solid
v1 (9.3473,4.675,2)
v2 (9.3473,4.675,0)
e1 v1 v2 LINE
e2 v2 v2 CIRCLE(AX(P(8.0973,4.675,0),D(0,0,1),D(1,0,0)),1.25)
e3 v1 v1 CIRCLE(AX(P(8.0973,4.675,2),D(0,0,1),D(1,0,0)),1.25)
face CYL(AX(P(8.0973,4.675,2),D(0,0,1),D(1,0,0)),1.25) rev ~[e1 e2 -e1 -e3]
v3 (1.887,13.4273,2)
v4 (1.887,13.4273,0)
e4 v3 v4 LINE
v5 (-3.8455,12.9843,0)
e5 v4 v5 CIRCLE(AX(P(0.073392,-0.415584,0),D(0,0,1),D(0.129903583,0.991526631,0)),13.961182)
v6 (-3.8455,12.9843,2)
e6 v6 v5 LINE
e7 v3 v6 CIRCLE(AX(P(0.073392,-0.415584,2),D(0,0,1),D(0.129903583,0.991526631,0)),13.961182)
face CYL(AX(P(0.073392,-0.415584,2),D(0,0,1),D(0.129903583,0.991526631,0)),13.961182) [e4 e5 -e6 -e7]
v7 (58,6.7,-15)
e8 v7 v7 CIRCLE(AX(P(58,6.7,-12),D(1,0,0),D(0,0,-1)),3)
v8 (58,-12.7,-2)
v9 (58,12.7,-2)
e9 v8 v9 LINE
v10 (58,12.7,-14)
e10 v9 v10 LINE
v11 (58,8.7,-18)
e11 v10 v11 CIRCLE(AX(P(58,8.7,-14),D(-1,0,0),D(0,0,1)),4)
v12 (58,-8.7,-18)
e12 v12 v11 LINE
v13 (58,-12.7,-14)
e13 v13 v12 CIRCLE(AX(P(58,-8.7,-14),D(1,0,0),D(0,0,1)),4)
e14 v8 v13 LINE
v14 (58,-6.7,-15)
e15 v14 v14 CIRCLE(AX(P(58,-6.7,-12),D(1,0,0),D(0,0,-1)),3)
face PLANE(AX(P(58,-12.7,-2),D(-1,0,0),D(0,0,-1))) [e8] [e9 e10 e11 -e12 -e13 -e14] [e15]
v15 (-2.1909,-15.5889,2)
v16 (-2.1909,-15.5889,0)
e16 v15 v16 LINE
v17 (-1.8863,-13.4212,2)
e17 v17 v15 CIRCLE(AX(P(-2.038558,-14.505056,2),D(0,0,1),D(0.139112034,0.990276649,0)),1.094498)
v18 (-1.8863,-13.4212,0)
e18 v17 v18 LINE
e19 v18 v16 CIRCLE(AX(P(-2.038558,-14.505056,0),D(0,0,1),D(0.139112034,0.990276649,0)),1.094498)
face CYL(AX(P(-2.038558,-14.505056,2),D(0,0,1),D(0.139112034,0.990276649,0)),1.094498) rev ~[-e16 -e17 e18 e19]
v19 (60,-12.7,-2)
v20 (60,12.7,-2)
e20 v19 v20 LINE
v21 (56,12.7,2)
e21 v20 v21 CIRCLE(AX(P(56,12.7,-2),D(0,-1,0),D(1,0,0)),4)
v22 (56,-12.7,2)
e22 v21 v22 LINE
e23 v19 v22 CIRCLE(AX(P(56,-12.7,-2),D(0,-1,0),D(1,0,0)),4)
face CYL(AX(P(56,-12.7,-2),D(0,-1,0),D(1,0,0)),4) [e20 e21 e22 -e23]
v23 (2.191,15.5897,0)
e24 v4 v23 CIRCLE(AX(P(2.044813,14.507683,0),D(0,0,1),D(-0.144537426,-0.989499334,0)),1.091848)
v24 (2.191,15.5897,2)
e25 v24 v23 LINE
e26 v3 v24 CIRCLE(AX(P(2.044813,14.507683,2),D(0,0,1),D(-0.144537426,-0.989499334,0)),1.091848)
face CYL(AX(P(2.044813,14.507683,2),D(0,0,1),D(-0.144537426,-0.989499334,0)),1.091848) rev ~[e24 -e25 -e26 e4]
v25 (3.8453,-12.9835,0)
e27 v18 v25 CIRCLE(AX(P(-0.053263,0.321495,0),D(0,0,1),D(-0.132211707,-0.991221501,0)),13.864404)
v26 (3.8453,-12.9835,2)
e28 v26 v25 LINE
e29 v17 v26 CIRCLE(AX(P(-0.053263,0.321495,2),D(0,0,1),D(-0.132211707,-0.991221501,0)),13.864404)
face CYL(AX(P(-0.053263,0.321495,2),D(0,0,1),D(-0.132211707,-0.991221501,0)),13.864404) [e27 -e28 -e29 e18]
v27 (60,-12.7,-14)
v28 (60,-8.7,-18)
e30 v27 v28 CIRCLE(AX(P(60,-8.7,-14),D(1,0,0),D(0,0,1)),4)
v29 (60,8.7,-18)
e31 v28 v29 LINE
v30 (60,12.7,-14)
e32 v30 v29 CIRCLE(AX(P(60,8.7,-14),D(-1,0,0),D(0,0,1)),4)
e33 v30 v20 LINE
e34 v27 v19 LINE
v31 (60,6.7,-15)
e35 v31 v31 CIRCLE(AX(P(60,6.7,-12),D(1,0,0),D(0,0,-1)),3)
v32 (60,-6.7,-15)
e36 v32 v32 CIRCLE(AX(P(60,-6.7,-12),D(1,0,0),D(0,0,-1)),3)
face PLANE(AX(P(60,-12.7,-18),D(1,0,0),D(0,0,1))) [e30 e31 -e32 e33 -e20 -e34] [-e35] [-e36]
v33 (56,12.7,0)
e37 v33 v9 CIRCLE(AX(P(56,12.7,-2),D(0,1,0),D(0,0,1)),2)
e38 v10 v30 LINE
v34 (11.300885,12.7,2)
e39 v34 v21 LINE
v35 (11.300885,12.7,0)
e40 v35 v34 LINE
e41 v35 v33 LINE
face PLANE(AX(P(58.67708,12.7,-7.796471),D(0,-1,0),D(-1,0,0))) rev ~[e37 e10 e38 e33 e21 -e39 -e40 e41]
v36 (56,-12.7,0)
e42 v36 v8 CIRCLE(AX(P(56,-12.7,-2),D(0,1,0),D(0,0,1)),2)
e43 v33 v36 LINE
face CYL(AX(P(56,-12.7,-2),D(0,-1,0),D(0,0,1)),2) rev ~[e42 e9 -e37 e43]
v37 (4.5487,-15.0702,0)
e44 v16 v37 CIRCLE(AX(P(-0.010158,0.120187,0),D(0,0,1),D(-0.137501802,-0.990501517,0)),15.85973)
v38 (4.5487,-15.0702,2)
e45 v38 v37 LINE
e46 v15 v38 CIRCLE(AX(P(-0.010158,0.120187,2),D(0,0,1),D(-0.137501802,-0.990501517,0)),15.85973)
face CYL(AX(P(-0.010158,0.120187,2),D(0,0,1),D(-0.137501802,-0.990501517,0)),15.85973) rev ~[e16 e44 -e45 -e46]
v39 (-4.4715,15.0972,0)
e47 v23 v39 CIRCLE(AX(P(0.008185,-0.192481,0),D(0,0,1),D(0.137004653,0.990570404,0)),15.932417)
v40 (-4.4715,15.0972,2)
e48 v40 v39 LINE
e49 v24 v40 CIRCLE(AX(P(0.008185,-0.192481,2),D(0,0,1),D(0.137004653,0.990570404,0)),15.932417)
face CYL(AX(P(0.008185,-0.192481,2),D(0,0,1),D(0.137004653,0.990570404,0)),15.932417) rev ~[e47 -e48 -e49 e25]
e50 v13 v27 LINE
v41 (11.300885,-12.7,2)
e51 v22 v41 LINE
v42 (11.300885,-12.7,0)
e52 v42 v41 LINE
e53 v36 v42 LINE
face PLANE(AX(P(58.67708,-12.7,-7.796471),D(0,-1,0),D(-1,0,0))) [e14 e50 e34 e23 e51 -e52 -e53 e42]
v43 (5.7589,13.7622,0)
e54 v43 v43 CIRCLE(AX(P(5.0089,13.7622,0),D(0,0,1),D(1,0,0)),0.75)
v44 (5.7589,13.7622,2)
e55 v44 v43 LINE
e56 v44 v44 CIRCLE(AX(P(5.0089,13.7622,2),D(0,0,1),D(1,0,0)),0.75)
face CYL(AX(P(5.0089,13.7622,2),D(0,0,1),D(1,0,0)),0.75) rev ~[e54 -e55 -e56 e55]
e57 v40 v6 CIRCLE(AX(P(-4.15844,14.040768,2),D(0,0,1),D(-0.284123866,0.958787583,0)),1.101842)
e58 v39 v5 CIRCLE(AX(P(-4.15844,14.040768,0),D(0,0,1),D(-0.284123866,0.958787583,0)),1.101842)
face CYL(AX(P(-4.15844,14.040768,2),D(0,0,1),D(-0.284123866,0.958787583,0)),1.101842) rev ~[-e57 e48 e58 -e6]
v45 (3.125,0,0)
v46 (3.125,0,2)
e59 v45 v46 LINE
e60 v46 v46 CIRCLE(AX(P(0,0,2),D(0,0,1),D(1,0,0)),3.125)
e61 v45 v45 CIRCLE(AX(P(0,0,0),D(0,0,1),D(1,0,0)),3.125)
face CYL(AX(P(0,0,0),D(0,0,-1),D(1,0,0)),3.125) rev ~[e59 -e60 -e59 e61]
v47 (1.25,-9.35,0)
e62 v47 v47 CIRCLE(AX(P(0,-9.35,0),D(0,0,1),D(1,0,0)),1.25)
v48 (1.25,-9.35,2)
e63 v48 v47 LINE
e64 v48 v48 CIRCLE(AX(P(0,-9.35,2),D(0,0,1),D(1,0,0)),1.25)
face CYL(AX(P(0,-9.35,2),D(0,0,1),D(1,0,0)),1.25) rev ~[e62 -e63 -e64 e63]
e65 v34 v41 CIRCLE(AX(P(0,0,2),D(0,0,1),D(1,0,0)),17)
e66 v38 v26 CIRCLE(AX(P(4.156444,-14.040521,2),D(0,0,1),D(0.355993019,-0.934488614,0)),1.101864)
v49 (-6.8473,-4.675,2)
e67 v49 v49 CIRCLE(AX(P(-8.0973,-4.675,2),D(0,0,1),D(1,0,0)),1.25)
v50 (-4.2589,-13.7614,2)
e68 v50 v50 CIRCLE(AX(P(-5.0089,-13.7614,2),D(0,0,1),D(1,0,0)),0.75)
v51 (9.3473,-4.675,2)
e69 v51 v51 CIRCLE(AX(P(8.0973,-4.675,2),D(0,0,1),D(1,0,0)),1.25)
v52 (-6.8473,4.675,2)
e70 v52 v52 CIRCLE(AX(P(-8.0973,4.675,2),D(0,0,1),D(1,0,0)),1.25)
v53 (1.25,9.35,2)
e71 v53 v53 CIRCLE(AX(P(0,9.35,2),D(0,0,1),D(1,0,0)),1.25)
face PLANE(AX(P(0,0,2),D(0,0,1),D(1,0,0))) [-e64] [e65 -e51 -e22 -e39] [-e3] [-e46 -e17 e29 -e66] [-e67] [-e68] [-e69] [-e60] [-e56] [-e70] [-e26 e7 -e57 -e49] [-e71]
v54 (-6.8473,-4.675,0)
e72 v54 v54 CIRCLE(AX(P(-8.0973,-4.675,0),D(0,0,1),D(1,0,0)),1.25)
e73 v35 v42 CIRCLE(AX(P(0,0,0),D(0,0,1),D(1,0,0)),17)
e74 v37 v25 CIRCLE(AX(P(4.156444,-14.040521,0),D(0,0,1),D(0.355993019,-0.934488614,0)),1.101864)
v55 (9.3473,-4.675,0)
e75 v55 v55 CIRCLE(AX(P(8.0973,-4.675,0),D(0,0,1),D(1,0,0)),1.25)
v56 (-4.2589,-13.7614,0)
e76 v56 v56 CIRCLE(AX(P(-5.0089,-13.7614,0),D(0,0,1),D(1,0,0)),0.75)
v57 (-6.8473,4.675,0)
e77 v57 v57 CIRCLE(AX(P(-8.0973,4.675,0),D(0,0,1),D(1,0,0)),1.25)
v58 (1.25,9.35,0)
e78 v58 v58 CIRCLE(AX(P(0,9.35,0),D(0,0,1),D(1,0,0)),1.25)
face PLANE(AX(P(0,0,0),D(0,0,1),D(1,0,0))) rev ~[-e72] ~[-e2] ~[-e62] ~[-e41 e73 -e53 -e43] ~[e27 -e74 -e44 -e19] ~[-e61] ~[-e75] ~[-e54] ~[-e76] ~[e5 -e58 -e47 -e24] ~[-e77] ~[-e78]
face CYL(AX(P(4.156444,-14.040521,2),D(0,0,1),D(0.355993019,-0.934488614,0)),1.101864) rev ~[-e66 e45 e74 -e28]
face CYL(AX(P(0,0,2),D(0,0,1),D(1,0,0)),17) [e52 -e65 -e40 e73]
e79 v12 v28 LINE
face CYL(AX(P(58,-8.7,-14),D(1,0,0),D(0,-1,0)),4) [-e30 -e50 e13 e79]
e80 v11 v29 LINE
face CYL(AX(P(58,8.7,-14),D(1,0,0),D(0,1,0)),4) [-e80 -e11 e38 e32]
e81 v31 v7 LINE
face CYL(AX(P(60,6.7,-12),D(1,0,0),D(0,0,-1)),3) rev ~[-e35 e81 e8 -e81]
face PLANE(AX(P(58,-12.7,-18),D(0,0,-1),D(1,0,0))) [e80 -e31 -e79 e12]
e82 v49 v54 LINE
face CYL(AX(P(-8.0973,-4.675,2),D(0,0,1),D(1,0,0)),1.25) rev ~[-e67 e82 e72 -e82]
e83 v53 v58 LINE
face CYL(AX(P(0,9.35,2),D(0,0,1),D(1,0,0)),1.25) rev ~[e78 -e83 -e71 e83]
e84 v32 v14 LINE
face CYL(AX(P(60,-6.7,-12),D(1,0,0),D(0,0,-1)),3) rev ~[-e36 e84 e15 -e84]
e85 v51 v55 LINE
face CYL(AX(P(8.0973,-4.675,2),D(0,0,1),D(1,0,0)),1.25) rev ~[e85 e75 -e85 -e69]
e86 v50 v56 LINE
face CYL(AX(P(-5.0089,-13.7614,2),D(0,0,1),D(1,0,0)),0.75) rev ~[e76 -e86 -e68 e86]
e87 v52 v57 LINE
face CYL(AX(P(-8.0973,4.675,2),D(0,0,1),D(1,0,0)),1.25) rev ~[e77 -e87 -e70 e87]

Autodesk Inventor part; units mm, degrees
ref_plane "YZ Plane" through (0, 0, 0) normal (1, 0, 0) x (0, 1, 0)
ref_plane "XZ Plane" through (0, 0, 0) normal (0, 1, 0) x (-1, 0, 0)
ref_plane "XY Plane" through (0, 0, 0) normal (0, 0, 1) x (1, 0, 0)
sketch "Base" plane through (0, 0, 0) normal (0, 0, 1) x (1, 0, 0)
  circle A0 centre (0, 0) radius 3.125
  circle A1 centre (0, 0) radius 12.7
  line L0 (0, 12.7) -> (60, 12.7)
  line L1 (60, 12.7) -> (60, -12.7)
  line L2 (60, -12.7) -> (0, -12.7)
  dimension "d0" = 6.25
  dimension "d1" = 25.4
  dimension "d2" = 60
extrude "Plate1" add sketch "Base" along normal blind 2
sketch "Sketch2" plane through (58, -12.7, 2) normal (1, 0, 0) x (0, 1, 0)
  line L0 (25.4, 0) -> (0, 0)
  line L1 (0, 0) -> (0, -20)
  line L2 (0, -20) -> (25.4, -20)
  line L3 (25.4, -20) -> (25.4, 0)
edge flange "MountFeature" height 20 angle 90 thickness 2 bend radius 2 thickness toward (1, 0, 0) relief tear relief width 2 relief depth 1 edges at (60, 0, 0) wall of the first edge with corners at (58, 12.7, 2) (58, -12.7, 2) (58, -12.7, -18) (58, 12.7, -18)
bend "Bend1"
corner "Corner1"
fillet "MountFilletsFeature" radius 4 2 edges at (59, -12.7, -18) (59, 12.7, -18)
sketch "HubMountHoles" plane through (0, 0, 2) normal (0, 0, 1) x (1, 0, 0)
  circle A0 centre (0, 9.35) radius 1.25 projected
  circle A1 centre (8.0973, 4.675) radius 1.25 projected
  circle A2 centre (8.0973, -4.675) radius 1.25 projected
  circle A3 centre (0, -9.35) radius 1.25 projected
  circle A4 centre (-8.0973, -4.675) radius 1.25 projected
  circle A5 centre (-8.0973, 4.675) radius 1.25 projected
  point P0 (0, 0)
extrude "HubMountHolesFeature" cut sketch "HubMountHoles" against normal blind 2
sketch "PotMountHoles" plane through (0, 0, 2) normal (0, 0, 1) x (1, 0, 0)
  arc A0 (2.191, 15.5897) -> (-4.4715, 15.0972) centre (0.0082, -0.192) ccw
  arc A1 (-4.4715, 15.0972) -> (-3.8455, 12.9843) centre (-4.1585, 14.0408) ccw
  arc A2 (1.887, 13.4273) -> (-3.8455, 12.9843) centre (0.0734, -0.4153) ccw
  arc A3 (1.887, 13.4273) -> (2.191, 15.5897) centre (2.0448, 14.5077) ccw
  circle A4 centre (5.0089, 13.7622) radius 0.75
  circle A5 centre (-5.0089, -13.7614) radius 0.75
  arc A6 (-1.8863, -13.4212) -> (-2.1909, -15.5889) centre (-2.0386, -14.505) ccw
  arc A7 (-1.8863, -13.4212) -> (3.8453, -12.9835) centre (-0.0533, 0.3202) ccw
  arc A8 (-2.1909, -15.5889) -> (4.5487, -15.0702) centre (-0.0101, 0.1221) ccw
  arc A9 (4.5487, -15.0702) -> (3.8453, -12.9835) centre (4.1564, -14.0405) ccw
  circle A10 centre (0, 0) radius 3.125
  circle A11 centre (0, 0) radius 17
  circle A12 centre (-8.0973, 4.675) radius 1.25
  circle A13 centre (0, 9.35) radius 1.25
  circle A14 centre (8.0973, 4.675) radius 1.25
  circle A15 centre (8.0973, -4.675) radius 1.25
  circle A16 centre (0, -9.35) radius 1.25
  circle A17 centre (-8.0973, -4.675) radius 1.25
  dimension "d17" = 34
sheet face with bend "PotMountHolesFeature" sketch "PotMountHoles" thickness 2 toward (0, 0, -1) bend radius 2
bend "Bend3"
sketch "Sketch5" plane through (60, -12.7, -2) normal (1, 0, 0) x (0, 0, -1)
  line L0 (0, 25.4) -> (12, 25.4) construction
  line L1 (12, 0) -> (0, 0) construction
  line L2 (10, 25.4) -> (10, 0) construction
  circle A0 centre (10, 19.4) radius 3
  circle A1 centre (10, 6) radius 3
  line L3 (16, 21.4) -> (16, 4) projected
  point P0 (-2, 12.7)
  dimension "d28" = 6
  dimension "d29" = 6
  dimension "d30" = 6
  dimension "d31" = 6
  dimension "d32" = 6
extrude "Cut2" cut sketch "Sketch5" against normal blind 2
equation "\"d15\" = Thickness"
equation "\"d33\" = Thickness"
equation "\"d3\" = Thickness"
equation "\"d4\" = BendReliefWidth"
equation "\"d5\" = BendReliefDepth"
equation "\"d6\" = MinimumRemnant"
equation "\"d7\" = TransitionRadius"
equation "\"d10\" = BendRadius"
equation "\"d11\" = CornerReliefSize"
equation "\"d12\" = GapSize"
equation "\"d13\" = JacobiRadiusSize"
equation "\"d23\" = BendRadius"
equation "\"d24\" = BendReliefWidth"
equation "\"d26\" = MinimumRemnant"
equation "\"d25\" = BendReliefDepth"
equation "\"d27\" = TransitionRadius"
equation "\"BendRadius\" = Thickness"
equation "\"BendReliefWidth\" = Thickness"
equation "\"BendReliefDepth\" = 0.5 * Thickness"
equation "\"CornerReliefSize\" = 4 * Thickness"
equation "\"MinimumRemnant\" = 2 * Thickness"
equation "\"TransitionRadius\" = BendRadius"
equation "\"JacobiRadiusSize\" = BendRadius"
equation "\"GapSize\" = Thickness"
equation "\"Thickness\" = 2"
properties part number "NeckPotentiometerBracket"
